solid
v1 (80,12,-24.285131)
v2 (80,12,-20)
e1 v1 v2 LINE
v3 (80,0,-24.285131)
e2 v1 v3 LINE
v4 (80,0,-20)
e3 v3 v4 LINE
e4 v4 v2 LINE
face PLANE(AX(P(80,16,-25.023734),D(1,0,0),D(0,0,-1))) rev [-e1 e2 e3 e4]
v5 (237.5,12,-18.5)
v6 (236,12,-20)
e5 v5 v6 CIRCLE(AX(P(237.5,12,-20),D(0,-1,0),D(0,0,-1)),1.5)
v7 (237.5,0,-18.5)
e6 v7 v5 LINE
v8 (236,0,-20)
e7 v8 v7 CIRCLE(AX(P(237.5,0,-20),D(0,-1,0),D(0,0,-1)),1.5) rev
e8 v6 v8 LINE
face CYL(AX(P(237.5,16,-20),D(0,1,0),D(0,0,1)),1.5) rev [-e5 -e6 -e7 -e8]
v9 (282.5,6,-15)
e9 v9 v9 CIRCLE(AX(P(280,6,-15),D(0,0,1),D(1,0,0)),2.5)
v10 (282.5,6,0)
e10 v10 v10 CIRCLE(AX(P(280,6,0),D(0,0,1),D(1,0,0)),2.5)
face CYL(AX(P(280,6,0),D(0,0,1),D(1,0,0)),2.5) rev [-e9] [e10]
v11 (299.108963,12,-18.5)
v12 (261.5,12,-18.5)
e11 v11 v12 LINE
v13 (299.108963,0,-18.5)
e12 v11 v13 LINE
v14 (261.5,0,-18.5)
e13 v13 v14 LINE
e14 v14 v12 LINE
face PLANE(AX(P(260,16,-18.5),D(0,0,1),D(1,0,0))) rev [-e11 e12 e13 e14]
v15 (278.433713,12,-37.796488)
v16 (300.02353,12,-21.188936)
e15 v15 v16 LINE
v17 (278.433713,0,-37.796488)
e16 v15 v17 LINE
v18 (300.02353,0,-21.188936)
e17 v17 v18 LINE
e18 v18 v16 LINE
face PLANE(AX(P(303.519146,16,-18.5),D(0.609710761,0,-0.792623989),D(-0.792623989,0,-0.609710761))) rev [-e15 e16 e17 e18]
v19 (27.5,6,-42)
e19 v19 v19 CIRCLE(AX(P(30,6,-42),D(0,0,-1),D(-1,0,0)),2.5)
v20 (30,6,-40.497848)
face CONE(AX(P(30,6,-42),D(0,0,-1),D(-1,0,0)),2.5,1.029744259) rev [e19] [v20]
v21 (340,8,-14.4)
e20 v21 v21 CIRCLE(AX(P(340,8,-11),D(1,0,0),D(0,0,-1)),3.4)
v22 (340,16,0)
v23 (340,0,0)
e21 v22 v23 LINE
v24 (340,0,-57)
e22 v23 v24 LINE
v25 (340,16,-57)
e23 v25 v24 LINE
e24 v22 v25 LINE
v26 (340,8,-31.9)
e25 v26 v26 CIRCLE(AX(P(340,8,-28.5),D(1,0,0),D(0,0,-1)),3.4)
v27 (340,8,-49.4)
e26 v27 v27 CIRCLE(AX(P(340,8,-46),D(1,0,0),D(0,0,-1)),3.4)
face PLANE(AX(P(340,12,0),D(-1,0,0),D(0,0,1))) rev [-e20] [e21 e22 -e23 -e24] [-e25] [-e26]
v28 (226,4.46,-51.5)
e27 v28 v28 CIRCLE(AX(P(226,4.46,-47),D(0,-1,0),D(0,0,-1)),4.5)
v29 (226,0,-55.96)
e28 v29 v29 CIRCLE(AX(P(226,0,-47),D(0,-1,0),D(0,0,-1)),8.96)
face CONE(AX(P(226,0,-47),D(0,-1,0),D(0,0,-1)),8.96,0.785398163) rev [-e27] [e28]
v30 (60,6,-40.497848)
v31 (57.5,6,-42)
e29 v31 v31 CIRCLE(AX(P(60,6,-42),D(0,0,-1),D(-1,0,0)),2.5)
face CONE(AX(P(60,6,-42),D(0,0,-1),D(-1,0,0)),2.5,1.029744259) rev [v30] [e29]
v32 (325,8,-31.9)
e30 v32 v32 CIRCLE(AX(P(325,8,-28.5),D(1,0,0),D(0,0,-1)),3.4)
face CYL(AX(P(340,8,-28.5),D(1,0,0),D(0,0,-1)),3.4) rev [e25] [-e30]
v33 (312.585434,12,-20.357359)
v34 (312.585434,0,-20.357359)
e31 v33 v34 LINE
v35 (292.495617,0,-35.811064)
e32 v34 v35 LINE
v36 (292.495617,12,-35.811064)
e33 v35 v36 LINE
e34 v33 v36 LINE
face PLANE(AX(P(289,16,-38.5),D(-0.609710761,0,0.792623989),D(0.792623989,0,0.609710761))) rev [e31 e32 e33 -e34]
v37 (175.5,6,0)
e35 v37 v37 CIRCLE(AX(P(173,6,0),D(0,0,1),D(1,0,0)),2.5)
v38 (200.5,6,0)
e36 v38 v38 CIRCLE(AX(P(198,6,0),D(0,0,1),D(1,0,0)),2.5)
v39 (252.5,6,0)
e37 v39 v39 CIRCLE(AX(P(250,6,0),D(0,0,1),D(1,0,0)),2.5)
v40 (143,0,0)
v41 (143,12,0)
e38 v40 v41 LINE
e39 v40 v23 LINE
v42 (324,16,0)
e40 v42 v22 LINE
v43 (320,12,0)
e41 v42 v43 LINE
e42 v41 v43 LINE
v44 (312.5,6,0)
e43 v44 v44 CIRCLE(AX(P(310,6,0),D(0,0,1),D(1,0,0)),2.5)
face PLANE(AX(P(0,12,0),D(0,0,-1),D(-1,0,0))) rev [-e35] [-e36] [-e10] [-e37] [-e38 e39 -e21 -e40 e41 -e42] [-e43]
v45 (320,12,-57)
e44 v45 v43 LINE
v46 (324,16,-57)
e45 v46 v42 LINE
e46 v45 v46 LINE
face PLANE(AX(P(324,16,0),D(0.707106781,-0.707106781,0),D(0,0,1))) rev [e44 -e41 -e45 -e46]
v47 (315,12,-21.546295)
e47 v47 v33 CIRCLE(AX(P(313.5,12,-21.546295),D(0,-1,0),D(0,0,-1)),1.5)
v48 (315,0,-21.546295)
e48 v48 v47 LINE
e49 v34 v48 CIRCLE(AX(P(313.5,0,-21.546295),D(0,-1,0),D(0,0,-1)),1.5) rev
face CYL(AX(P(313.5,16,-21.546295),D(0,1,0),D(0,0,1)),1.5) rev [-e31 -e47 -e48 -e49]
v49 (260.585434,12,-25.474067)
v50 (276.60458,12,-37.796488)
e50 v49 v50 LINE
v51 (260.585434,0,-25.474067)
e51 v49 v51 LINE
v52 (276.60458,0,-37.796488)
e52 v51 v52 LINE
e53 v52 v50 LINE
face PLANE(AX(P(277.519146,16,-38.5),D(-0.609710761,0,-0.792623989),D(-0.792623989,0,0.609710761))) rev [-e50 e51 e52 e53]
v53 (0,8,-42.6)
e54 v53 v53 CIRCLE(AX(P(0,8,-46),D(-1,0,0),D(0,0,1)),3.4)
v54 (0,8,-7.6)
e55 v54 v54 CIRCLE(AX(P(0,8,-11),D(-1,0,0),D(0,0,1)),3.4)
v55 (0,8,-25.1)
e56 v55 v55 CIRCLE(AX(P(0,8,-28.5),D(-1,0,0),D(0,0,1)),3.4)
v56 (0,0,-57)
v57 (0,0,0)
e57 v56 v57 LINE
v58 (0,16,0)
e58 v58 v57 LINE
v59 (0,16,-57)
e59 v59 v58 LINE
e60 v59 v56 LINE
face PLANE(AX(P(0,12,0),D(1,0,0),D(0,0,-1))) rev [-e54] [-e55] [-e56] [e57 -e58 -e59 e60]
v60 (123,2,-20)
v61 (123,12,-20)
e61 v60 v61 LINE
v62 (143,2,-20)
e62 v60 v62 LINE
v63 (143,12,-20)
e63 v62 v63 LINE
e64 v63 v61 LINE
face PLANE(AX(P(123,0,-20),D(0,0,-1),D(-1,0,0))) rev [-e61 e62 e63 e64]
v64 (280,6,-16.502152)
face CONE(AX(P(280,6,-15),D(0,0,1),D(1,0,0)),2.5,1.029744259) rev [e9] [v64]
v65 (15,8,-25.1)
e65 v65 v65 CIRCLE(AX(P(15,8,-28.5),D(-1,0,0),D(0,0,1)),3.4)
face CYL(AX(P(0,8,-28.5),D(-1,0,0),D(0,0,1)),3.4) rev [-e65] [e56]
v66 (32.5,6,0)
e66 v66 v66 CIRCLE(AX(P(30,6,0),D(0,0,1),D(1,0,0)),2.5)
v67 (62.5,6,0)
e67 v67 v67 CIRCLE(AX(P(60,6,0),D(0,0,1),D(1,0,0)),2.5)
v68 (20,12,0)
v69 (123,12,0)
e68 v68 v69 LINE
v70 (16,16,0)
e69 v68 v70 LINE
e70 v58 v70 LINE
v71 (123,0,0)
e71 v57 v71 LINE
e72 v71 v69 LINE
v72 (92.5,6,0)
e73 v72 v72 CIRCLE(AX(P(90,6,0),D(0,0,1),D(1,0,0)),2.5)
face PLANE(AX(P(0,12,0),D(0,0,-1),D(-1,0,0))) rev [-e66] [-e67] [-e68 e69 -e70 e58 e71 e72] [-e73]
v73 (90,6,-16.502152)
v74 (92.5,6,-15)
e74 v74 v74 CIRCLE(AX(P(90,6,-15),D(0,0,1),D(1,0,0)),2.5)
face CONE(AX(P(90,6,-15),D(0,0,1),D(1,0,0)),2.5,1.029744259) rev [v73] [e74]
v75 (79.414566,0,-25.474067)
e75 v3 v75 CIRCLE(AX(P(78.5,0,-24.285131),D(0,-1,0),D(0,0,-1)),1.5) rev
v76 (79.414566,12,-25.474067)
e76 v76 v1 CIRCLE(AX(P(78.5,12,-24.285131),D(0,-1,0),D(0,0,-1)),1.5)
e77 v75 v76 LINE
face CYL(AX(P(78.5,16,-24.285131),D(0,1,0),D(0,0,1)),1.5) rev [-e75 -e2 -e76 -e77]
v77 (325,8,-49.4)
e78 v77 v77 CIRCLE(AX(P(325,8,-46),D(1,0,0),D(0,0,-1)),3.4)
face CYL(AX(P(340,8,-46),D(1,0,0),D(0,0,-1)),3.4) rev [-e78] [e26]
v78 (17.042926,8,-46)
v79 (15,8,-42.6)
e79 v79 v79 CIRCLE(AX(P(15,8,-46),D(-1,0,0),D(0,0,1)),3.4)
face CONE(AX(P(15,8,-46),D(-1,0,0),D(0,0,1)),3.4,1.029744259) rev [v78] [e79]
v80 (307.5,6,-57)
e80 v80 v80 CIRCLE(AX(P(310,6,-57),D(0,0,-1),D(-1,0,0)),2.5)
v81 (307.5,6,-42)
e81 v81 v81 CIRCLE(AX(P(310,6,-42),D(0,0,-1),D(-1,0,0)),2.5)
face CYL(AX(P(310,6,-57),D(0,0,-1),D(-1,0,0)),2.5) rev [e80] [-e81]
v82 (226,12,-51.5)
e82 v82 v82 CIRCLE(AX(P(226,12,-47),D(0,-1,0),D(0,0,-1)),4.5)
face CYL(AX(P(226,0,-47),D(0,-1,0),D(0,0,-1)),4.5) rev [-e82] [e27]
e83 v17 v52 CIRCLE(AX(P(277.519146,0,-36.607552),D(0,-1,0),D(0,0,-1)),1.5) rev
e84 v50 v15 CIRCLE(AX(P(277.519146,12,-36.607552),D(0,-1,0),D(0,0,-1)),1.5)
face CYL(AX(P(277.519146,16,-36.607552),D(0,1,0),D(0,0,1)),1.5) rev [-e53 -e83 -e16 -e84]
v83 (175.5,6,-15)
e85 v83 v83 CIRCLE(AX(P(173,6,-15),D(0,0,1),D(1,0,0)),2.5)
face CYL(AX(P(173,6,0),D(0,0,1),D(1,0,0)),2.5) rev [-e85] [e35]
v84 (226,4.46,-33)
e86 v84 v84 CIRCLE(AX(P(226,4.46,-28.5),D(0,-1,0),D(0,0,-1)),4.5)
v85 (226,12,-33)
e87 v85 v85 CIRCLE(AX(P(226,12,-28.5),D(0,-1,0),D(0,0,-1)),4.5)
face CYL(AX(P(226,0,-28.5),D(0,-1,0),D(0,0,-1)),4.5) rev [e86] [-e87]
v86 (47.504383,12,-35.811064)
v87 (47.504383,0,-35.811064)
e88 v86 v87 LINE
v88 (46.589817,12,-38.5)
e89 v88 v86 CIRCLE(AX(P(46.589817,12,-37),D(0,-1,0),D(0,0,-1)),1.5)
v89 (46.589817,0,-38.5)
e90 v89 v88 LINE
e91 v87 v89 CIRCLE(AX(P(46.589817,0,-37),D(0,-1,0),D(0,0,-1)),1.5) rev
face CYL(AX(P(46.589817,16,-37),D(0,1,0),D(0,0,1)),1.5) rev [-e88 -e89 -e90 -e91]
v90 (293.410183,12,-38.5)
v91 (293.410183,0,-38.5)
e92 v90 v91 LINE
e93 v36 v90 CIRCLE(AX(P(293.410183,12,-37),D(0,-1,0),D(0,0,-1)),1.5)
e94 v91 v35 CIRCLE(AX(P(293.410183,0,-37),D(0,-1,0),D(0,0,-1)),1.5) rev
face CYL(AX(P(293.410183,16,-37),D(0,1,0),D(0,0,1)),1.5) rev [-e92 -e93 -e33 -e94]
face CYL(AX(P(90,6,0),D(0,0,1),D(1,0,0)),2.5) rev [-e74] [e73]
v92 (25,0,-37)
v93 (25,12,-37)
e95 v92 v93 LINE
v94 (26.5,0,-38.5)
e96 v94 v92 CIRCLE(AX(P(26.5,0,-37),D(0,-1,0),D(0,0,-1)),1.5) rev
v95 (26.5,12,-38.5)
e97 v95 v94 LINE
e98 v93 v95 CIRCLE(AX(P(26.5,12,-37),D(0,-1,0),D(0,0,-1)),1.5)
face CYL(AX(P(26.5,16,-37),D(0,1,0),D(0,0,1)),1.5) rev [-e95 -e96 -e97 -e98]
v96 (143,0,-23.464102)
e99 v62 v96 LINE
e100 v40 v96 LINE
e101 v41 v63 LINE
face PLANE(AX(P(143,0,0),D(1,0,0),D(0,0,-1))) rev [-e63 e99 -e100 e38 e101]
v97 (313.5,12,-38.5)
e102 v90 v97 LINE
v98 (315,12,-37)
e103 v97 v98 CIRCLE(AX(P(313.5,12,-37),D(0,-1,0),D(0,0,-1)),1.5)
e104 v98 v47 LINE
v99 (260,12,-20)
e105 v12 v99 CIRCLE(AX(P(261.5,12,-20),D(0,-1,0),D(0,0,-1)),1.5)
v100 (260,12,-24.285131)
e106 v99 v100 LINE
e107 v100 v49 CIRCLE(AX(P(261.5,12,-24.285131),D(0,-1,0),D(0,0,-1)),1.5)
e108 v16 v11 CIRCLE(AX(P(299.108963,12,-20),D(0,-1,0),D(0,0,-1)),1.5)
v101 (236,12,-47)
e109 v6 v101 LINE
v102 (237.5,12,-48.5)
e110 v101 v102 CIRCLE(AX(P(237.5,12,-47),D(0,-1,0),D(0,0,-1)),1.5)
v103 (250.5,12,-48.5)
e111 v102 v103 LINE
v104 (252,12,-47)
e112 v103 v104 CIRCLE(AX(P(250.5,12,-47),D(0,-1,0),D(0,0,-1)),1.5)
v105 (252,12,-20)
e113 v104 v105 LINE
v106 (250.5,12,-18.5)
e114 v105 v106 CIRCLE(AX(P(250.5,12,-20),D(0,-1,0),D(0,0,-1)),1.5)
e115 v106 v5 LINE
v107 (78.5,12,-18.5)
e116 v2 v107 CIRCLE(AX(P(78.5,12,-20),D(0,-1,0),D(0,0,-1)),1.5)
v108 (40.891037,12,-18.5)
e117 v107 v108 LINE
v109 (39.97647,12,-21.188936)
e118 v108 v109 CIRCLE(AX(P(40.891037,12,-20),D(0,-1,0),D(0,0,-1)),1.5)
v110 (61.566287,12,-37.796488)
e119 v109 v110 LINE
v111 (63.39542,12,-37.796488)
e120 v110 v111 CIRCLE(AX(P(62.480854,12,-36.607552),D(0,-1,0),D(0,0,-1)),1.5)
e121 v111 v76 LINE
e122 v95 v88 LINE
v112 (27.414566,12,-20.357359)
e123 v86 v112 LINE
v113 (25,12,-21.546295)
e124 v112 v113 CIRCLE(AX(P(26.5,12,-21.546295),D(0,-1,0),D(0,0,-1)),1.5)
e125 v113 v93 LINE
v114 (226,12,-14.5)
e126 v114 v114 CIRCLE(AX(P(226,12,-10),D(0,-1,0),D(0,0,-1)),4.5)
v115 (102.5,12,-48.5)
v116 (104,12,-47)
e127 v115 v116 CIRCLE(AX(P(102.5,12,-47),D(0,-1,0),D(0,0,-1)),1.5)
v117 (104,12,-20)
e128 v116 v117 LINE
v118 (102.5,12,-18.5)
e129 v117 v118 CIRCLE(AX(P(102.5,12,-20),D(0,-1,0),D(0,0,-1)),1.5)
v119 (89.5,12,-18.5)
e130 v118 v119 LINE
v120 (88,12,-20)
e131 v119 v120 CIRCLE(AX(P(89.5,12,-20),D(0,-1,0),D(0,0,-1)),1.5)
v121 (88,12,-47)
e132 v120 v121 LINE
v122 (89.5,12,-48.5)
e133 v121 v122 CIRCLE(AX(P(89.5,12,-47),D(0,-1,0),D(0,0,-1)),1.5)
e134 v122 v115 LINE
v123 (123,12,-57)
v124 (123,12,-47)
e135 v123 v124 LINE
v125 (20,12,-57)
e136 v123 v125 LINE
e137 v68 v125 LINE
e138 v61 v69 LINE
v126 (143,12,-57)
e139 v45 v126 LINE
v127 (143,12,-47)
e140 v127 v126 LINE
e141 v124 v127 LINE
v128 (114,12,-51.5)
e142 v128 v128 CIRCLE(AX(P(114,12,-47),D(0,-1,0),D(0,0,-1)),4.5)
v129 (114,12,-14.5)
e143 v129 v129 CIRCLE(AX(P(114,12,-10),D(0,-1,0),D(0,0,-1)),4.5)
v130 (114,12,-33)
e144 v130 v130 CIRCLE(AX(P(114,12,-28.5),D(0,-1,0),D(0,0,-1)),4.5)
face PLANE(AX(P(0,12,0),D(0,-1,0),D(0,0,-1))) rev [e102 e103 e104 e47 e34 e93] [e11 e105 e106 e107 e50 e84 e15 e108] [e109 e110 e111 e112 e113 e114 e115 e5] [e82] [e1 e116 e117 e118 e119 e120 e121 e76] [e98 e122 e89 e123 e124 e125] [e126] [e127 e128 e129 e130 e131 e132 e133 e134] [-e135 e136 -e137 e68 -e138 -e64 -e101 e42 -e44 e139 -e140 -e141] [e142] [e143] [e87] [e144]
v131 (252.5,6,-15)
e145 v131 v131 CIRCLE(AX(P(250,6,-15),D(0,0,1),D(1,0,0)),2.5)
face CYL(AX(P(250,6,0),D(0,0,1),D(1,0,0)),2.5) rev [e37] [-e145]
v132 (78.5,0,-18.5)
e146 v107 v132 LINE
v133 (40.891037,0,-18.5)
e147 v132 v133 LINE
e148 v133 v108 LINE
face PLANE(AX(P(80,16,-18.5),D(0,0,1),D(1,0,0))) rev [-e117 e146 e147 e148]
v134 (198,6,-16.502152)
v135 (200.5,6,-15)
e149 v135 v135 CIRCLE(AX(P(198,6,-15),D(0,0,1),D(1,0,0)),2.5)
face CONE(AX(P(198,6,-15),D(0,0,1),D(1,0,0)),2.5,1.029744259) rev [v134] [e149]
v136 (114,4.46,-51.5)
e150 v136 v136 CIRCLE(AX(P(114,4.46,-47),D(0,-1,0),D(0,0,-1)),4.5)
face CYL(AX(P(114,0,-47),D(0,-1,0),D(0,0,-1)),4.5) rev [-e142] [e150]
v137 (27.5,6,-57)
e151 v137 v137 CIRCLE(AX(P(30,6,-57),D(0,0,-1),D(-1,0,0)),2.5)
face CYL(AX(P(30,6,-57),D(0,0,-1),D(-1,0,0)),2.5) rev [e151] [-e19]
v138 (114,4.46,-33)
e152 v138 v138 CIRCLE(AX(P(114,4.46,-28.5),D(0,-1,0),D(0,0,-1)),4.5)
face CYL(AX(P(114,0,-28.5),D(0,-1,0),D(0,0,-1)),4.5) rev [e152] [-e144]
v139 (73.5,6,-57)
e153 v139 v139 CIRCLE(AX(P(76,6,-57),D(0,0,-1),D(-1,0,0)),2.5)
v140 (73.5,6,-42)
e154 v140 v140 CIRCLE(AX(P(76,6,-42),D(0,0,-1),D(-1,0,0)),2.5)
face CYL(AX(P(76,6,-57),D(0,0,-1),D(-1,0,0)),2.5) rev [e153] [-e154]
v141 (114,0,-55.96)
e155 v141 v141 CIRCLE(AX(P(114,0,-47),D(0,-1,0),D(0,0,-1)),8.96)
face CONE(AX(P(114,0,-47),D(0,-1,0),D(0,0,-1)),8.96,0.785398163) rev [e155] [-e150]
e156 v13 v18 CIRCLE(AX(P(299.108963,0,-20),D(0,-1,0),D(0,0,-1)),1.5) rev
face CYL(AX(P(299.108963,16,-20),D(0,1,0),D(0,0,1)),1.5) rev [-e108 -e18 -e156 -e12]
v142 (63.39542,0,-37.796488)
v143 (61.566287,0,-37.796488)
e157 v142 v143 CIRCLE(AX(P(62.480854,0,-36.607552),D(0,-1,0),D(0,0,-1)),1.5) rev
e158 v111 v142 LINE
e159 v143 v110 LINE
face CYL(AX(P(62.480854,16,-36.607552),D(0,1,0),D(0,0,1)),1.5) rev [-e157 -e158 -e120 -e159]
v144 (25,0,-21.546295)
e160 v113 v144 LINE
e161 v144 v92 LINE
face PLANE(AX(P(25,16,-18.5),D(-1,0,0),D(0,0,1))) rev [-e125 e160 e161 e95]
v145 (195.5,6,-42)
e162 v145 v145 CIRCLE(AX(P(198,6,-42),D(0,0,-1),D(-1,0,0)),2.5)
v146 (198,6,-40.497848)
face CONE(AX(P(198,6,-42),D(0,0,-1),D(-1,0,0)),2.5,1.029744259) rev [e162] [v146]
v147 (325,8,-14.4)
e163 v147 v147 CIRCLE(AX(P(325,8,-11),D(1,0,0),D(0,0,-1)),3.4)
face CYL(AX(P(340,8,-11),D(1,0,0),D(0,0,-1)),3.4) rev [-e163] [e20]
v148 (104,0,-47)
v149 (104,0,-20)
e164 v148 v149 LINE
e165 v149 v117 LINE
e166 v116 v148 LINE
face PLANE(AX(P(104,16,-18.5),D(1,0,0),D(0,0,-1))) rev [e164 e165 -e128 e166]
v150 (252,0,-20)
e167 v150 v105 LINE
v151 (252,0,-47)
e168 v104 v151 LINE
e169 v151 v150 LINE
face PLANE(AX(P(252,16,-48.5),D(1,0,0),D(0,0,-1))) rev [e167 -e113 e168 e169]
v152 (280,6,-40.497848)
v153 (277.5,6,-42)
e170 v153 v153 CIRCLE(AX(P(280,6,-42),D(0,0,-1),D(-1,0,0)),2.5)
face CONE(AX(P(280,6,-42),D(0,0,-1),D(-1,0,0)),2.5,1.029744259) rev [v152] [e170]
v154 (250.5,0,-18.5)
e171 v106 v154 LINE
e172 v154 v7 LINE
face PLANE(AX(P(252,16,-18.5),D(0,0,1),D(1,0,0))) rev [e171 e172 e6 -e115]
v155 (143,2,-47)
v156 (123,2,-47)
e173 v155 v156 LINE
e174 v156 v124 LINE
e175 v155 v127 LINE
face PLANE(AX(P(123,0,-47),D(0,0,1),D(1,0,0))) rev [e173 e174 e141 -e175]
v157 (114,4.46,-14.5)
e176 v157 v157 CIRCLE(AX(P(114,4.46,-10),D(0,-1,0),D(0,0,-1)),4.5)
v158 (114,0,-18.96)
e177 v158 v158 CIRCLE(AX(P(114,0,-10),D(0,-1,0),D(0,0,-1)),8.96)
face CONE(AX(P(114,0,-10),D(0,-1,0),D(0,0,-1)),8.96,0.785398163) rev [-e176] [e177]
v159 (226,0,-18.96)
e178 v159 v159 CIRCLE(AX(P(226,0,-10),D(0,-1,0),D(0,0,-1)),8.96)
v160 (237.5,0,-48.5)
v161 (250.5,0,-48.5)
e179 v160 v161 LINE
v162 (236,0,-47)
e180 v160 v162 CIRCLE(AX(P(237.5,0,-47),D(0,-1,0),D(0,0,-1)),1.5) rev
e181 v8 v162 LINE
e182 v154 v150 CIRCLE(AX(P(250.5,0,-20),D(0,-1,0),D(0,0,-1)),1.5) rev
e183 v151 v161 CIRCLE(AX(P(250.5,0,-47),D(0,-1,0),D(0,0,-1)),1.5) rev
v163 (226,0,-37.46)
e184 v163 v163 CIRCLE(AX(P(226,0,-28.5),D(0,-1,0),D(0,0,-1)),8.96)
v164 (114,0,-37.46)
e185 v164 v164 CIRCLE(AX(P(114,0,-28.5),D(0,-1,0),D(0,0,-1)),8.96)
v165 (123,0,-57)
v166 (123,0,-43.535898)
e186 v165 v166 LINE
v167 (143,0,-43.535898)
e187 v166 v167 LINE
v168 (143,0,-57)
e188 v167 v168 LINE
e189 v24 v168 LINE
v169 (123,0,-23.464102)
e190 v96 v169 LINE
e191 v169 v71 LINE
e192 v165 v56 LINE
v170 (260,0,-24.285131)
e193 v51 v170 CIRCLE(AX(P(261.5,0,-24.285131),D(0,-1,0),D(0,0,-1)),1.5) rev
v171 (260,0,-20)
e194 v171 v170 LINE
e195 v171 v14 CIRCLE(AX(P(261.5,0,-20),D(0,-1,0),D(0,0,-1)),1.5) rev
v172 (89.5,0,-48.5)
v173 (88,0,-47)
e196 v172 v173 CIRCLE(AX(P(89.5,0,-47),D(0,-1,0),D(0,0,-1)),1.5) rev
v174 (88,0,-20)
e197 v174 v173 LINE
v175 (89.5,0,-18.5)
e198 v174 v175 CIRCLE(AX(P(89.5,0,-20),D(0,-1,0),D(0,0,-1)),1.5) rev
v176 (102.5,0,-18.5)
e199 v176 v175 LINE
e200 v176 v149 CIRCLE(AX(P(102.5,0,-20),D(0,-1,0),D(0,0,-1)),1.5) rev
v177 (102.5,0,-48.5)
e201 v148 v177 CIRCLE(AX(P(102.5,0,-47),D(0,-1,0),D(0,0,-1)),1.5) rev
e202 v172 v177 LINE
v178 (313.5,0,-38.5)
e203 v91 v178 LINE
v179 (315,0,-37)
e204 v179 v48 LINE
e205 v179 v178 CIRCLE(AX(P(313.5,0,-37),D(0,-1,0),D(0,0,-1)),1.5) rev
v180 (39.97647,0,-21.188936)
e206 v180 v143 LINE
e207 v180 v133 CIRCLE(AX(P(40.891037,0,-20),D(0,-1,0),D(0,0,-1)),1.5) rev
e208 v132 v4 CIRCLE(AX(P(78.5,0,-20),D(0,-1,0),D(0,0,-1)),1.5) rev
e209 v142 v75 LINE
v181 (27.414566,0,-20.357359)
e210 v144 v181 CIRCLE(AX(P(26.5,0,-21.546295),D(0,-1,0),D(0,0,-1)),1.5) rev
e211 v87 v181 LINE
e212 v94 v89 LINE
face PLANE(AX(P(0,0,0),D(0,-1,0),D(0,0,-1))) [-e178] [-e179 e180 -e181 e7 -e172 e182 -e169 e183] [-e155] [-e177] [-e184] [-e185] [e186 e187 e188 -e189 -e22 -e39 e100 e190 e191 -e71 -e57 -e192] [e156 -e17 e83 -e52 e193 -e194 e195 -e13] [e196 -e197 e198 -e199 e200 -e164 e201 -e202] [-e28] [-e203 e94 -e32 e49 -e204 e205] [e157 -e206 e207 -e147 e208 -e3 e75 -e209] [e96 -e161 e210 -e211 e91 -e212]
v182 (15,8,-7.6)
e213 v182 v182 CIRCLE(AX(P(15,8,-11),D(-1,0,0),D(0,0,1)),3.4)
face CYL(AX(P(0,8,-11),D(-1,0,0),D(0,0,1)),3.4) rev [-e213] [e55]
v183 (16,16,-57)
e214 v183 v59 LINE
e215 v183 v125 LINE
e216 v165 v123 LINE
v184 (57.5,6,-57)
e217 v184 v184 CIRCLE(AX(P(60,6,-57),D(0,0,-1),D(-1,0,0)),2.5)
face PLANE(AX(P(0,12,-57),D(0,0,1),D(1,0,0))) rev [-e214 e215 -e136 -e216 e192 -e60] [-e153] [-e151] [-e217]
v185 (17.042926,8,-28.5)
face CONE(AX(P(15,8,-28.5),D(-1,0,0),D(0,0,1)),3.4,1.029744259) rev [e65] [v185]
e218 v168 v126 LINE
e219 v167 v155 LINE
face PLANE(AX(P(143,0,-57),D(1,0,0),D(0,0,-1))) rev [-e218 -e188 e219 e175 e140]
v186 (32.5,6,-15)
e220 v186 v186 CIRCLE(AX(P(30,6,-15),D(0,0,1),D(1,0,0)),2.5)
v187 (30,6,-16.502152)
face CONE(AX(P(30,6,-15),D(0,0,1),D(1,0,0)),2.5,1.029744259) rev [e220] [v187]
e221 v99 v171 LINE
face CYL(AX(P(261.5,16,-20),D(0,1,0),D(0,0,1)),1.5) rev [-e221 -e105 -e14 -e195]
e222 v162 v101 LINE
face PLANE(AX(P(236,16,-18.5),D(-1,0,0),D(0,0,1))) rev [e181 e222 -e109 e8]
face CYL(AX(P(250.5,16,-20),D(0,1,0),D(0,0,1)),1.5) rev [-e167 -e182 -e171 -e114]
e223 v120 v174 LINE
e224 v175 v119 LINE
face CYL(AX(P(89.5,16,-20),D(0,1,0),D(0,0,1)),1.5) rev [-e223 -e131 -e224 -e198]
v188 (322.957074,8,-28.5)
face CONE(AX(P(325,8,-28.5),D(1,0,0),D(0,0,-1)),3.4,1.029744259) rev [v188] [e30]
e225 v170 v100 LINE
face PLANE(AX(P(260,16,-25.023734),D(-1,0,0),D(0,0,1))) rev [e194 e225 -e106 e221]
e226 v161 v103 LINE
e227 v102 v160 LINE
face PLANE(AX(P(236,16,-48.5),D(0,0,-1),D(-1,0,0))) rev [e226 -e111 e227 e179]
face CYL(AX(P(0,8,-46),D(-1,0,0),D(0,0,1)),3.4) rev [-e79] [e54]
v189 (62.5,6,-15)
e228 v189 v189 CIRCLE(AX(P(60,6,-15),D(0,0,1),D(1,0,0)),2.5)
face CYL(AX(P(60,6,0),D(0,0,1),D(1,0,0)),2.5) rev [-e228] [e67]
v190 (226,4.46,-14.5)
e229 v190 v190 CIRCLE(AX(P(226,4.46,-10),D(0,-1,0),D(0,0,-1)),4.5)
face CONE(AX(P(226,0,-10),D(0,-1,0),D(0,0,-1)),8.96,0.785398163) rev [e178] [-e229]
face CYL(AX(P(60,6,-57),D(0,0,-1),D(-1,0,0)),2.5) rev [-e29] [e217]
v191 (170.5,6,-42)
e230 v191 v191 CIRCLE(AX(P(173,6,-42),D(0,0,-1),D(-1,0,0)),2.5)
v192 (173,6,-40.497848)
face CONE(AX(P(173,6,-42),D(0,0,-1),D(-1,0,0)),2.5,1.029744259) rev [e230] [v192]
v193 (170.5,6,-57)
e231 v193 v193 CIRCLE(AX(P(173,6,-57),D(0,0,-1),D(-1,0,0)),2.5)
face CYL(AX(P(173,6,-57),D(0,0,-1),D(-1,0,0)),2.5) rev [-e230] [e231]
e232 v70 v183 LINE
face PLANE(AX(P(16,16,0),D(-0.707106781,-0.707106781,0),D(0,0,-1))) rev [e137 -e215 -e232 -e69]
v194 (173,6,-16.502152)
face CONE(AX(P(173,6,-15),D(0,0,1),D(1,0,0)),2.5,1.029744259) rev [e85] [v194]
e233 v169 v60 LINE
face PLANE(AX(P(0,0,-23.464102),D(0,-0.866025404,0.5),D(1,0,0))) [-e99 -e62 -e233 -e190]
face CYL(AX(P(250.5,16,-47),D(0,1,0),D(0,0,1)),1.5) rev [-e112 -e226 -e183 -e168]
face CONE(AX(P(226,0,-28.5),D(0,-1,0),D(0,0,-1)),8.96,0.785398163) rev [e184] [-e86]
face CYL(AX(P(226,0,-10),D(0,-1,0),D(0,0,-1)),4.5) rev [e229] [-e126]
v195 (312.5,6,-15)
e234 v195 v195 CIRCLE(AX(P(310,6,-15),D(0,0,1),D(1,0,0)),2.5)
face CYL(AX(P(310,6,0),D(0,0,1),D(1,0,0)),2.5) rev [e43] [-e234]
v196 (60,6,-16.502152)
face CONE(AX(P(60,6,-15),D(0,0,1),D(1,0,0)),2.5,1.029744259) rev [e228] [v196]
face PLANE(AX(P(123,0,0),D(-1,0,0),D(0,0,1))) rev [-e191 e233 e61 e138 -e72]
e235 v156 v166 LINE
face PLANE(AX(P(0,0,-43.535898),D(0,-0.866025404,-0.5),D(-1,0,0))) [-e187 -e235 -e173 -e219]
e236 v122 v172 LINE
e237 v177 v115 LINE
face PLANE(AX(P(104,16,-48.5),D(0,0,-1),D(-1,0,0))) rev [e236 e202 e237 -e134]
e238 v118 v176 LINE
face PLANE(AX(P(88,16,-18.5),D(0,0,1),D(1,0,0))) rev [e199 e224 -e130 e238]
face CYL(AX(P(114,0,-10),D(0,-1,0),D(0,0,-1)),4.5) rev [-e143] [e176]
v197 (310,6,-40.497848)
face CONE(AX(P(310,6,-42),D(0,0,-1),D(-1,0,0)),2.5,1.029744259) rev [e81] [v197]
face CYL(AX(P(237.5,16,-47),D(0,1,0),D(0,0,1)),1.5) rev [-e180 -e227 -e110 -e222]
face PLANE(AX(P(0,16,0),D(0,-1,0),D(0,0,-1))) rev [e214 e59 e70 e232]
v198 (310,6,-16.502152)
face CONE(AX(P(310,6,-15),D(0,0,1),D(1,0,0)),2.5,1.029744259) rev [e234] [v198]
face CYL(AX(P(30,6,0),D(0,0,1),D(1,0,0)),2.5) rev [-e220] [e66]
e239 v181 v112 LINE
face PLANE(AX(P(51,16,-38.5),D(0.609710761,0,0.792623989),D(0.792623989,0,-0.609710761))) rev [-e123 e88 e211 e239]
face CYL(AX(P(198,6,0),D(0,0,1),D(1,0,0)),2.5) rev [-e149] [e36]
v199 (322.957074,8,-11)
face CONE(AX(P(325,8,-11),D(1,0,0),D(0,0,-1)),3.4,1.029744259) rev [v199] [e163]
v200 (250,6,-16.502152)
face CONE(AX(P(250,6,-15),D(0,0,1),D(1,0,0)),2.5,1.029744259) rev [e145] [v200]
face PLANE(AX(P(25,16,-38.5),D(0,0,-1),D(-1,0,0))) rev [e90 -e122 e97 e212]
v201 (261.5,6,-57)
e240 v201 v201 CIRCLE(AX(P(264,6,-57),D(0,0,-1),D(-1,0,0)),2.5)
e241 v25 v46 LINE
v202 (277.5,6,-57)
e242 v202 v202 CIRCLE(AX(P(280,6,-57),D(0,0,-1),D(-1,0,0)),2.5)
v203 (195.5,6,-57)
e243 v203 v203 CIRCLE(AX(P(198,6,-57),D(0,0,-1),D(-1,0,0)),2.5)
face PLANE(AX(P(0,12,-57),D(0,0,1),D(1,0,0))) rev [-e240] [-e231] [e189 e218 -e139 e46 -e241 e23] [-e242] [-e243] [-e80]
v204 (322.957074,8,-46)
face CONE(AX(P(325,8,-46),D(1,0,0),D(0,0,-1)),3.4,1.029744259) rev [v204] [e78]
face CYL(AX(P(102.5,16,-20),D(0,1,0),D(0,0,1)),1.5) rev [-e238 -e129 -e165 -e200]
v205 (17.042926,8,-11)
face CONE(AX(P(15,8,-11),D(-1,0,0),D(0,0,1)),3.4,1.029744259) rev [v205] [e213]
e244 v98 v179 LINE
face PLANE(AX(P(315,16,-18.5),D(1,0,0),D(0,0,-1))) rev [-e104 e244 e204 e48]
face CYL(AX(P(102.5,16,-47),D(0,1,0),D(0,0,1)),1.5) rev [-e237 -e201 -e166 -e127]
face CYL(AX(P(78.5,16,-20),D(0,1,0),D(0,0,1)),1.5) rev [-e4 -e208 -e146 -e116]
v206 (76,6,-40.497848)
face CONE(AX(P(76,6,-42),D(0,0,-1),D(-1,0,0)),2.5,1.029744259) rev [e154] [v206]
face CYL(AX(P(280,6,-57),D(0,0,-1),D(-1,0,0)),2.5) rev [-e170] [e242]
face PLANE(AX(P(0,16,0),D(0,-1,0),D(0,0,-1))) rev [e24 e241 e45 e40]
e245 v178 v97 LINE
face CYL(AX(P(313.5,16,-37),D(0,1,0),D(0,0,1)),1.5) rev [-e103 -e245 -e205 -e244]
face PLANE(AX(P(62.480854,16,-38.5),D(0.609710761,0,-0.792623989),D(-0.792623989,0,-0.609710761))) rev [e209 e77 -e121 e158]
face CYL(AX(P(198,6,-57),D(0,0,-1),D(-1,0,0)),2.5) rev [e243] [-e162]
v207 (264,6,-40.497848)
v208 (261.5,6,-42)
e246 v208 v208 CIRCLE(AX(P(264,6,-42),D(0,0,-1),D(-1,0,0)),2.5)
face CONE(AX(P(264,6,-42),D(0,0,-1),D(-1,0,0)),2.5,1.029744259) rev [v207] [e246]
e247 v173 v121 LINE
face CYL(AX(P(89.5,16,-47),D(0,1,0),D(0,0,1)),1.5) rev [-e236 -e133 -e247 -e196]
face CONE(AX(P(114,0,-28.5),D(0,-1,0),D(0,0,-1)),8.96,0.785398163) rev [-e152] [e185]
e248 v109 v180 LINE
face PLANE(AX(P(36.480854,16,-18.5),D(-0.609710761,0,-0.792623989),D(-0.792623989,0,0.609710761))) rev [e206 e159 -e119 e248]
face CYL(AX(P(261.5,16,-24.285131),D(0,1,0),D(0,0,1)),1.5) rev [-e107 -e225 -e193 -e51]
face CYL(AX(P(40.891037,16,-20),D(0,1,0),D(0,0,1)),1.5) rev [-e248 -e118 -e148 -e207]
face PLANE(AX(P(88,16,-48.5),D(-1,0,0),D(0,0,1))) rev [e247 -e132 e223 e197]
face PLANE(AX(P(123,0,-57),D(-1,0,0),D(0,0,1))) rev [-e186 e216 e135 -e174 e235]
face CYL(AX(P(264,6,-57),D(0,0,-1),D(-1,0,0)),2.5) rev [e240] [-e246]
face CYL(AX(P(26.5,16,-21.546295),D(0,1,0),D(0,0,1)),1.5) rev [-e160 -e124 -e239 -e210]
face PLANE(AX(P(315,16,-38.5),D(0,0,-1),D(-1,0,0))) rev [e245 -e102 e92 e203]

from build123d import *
from OCP.BRepFilletAPI import BRepFilletAPI_MakeChamfer

# Parameters (mm, degrees)
ESBO_O1_W                                           = 340
ESBO_O1_H                                           = 57
RESSALTO_EXTRUS_O1_DEPTH                            = 12
ESBO_O2_W                                           = 20
ESBO_O2_H                                           = 57
RESSALTO_EXTRUS_O2_DEPTH                            = 4
BROCA_DE_ROSQUEAR_PARA_TARRAXA_DE_M81_D             = 6.8
BROCA_DE_ROSQUEAR_PARA_TARRAXA_DE_M81_DEPTH         = 15
BROCA_DE_ROSQUEAR_PARA_TARRAXA_DE_M81_TIP           = 2.042926105
BROCA_DE_ROSQUEAR_PARA_TARRAXA_DE_M82_D             = 6.8
BROCA_DE_ROSQUEAR_PARA_TARRAXA_DE_M82_DEPTH         = 15
BROCA_DE_ROSQUEAR_PARA_TARRAXA_DE_M82_TIP           = 2.042926105
ESBO_O7_W                                           = 20
ESBO_O7_H                                           = 10
ESBO_O7_H_2                                         = 20
CORTE_EXTRUS_O1_DEPTH                               = 345.953620071
CHANFRO1_SIZE                                       = 2
CHANFRO1_SIZE2                                      = 3.464101615
CHANFRO3_SIZE                                       = 4
BROCA_DE_ROSQUEAR_PARA_TARRAXA_DE_M61_D             = 5
BROCA_DE_ROSQUEAR_PARA_TARRAXA_DE_M61_DEPTH         = 15
BROCA_DE_ROSQUEAR_PARA_TARRAXA_DE_M61_TIP           = 1.502151548
BROCA_DE_ROSQUEAR_PARA_TARRAXA_DE_M62_D             = 5
BROCA_DE_ROSQUEAR_PARA_TARRAXA_DE_M62_DEPTH         = 15
BROCA_DE_ROSQUEAR_PARA_TARRAXA_DE_M62_TIP           = 1.502151548
ESCAREADO_PARA_PARAFUSO_ALLEN_SEXTAVADO_D           = 9
ESCAREADO_PARA_PARAFUSO_ALLEN_SEXTAVADO_DEPTH       = 15
ESCAREADO_PARA_PARAFUSO_ALLEN_SEXTAVADO_CSINK_D     = 17.92
ESCAREADO_PARA_PARAFUSO_ALLEN_SEXTAVADO_CSINK_ANGLE = 90
ESCAREADO_PARA_PARAFUSO_ALLEN_SEXTAVADO_TIP         = 2.703872786
ESBO_O19_W                                          = 16
ESBO_O19_H                                          = 30
CORTE_EXTRUS_O3_DEPTH                               = 346.115922554
FILETE6_R                                           = 1.5


with BuildPart() as part:
    # Esboço1 → Ressalto-extrusão1 (new body)
    with BuildSketch(Plane(origin=(0, 0, 0), x_dir=(1, 0, 0), z_dir=(0, 1, 0))):
        with Locations((170, 28.5)):
            Rectangle(ESBO_O1_W, ESBO_O1_H)
    extrude(amount=RESSALTO_EXTRUS_O1_DEPTH)

    # Esboço2 → Ressalto-extrusão2 (add)
    with BuildSketch(Plane(origin=(0, 12, 0), x_dir=(1, 0, 0), z_dir=(0, 1, 0))):
        with Locations((10, 28.5)):
            Rectangle(ESBO_O2_W, ESBO_O2_H)
        with Locations((330, 28.5)):
            Rectangle(ESBO_O2_W, ESBO_O2_H)
    extrude(amount=RESSALTO_EXTRUS_O2_DEPTH)

    # Broca de rosquear para tarraxa de M81
    with Locations(Plane.ZY):
        with Locations((-46, 8), (-28.5, 8), (-11, 8)):
            Hole(BROCA_DE_ROSQUEAR_PARA_TARRAXA_DE_M81_D / 2, depth=BROCA_DE_ROSQUEAR_PARA_TARRAXA_DE_M81_DEPTH)
            with Locations((0, 0, -(BROCA_DE_ROSQUEAR_PARA_TARRAXA_DE_M81_DEPTH + BROCA_DE_ROSQUEAR_PARA_TARRAXA_DE_M81_TIP / 2))):  # 118° drill point
                Cone(0, BROCA_DE_ROSQUEAR_PARA_TARRAXA_DE_M81_D / 2, BROCA_DE_ROSQUEAR_PARA_TARRAXA_DE_M81_TIP, mode=Mode.SUBTRACT)

    # Broca de rosquear para tarraxa de M82
    with Locations(Plane(origin=(340, 0, 0), x_dir=(0, 0, -1), z_dir=(1, 0, 0))):
        with Locations((28.5, 8), (11, 8), (46, 8)):
            Hole(BROCA_DE_ROSQUEAR_PARA_TARRAXA_DE_M82_D / 2, depth=BROCA_DE_ROSQUEAR_PARA_TARRAXA_DE_M82_DEPTH)
            with Locations((0, 0, -(BROCA_DE_ROSQUEAR_PARA_TARRAXA_DE_M82_DEPTH + BROCA_DE_ROSQUEAR_PARA_TARRAXA_DE_M82_TIP / 2))):  # 118° drill point
                Cone(0, BROCA_DE_ROSQUEAR_PARA_TARRAXA_DE_M82_D / 2, BROCA_DE_ROSQUEAR_PARA_TARRAXA_DE_M82_TIP, mode=Mode.SUBTRACT)

    # Esboço7 → Corte-extrusão1 (cut, through all)
    with BuildSketch(Plane(origin=(0, 12, 0), x_dir=(1, 0, 0), z_dir=(0, 1, 0))):
        with Locations((133, 52)):
            Rectangle(ESBO_O7_W, ESBO_O7_H)
        with Locations((133, 10)):
            Rectangle(ESBO_O7_W, ESBO_O7_H_2)
    extrude(amount=-CORTE_EXTRUS_O1_DEPTH, mode=Mode.SUBTRACT)

    # Chanfro1: one chamfer whose edges measure the first distance from different faces: ONE call of the kernel's chamfer builder (chamfer() names one face for all edges)
    chanfro1_edges_1 = [part.edges().sort_by_distance(p)[0] for p in [
        (133, 0, -47),
    ]]
    chanfro1_side_1 = [part.faces().sort_by_distance(p)[0] for p in [
        (133, 6, -47),
    ]]
    chanfro1_edges_2 = [part.edges().sort_by_distance(p)[0] for p in [
        (133, 0, -20),
    ]]
    chanfro1_side_2 = [part.faces().sort_by_distance(p)[0] for p in [
        (133, 6, -20),
    ]]
    chanfro1 = BRepFilletAPI_MakeChamfer(part.part.solid().wrapped)
    for e in chanfro1_edges_1:
        chanfro1.Add(CHANFRO1_SIZE, CHANFRO1_SIZE2, e.wrapped, chanfro1_side_1[0].wrapped)  # the first distance lies on this face
    for e in chanfro1_edges_2:
        chanfro1.Add(CHANFRO1_SIZE, CHANFRO1_SIZE2, e.wrapped, chanfro1_side_2[0].wrapped)  # the first distance lies on this face
    add(Compound.cast(chanfro1.Shape()), mode=Mode.REPLACE)

    # Chanfro3
    chanfro3_edges = [part.edges().sort_by_distance(p)[0] for p in [
        (20, 16, -28.5),
        (320, 16, -28.5),
    ]]
    chamfer(chanfro3_edges, length=CHANFRO3_SIZE - 0.0001)  # a hair under: the kernel refuses the full size

    # Broca de rosquear para tarraxa de M61
    with Locations(Plane(origin=(0, 0, -57), x_dir=(-1, 0, 0), z_dir=(0, 0, -1))):
        with Locations((-310, 6), (-280, 6), (-30, 6), (-60, 6), (-264, 6), (-76, 6), (-198, 6), (-173, 6)):
            Hole(BROCA_DE_ROSQUEAR_PARA_TARRAXA_DE_M61_D / 2, depth=BROCA_DE_ROSQUEAR_PARA_TARRAXA_DE_M61_DEPTH)
            with Locations((0, 0, -(BROCA_DE_ROSQUEAR_PARA_TARRAXA_DE_M61_DEPTH + BROCA_DE_ROSQUEAR_PARA_TARRAXA_DE_M61_TIP / 2))):  # 118° drill point
                Cone(0, BROCA_DE_ROSQUEAR_PARA_TARRAXA_DE_M61_D / 2, BROCA_DE_ROSQUEAR_PARA_TARRAXA_DE_M61_TIP, mode=Mode.SUBTRACT)

    # Broca de rosquear para tarraxa de M62
    with Locations(Plane.XY):
        with Locations((30, 6), (60, 6), (280, 6), (310, 6), (90, 6), (250, 6), (173, 6), (198, 6)):
            Hole(BROCA_DE_ROSQUEAR_PARA_TARRAXA_DE_M62_D / 2, depth=BROCA_DE_ROSQUEAR_PARA_TARRAXA_DE_M62_DEPTH)
            with Locations((0, 0, -(BROCA_DE_ROSQUEAR_PARA_TARRAXA_DE_M62_DEPTH + BROCA_DE_ROSQUEAR_PARA_TARRAXA_DE_M62_TIP / 2))):  # 118° drill point
                Cone(0, BROCA_DE_ROSQUEAR_PARA_TARRAXA_DE_M62_D / 2, BROCA_DE_ROSQUEAR_PARA_TARRAXA_DE_M62_TIP, mode=Mode.SUBTRACT)

    # Escareado para parafuso Allen sextavado escareado de M82
    with Locations(Plane(origin=(0, 0, 0), x_dir=(-1, 0, 0), z_dir=(0, -1, 0))):
        with Locations((-114, 47), (-114, 28.5), (-114, 10), (-226, 47), (-226, 28.5), (-226, 10)):
            CounterSinkHole(ESCAREADO_PARA_PARAFUSO_ALLEN_SEXTAVADO_D / 2, ESCAREADO_PARA_PARAFUSO_ALLEN_SEXTAVADO_CSINK_D / 2, depth=ESCAREADO_PARA_PARAFUSO_ALLEN_SEXTAVADO_DEPTH, counter_sink_angle=ESCAREADO_PARA_PARAFUSO_ALLEN_SEXTAVADO_CSINK_ANGLE)
            with Locations((0, 0, -(ESCAREADO_PARA_PARAFUSO_ALLEN_SEXTAVADO_DEPTH + ESCAREADO_PARA_PARAFUSO_ALLEN_SEXTAVADO_TIP / 2))):  # 118° drill point
                Cone(0, ESCAREADO_PARA_PARAFUSO_ALLEN_SEXTAVADO_D / 2, ESCAREADO_PARA_PARAFUSO_ALLEN_SEXTAVADO_TIP, mode=Mode.SUBTRACT)

    # Esboço19 → Corte-extrusão3 (cut, through all)
    with BuildSketch(Plane.XZ):
        Polygon((25, -18.5), (25, -38.5), (51, -38.5), align=None)
        Polygon((36.480853627, -18.5), (62.480853627, -38.5), (80, -25.023733559), (80, -18.5), (62.480853627, -18.5), align=None)
        with Locations((96, -33.5)):
            Rectangle(ESBO_O19_W, ESBO_O19_H)
        with Locations((244, -33.5)):
            Rectangle(ESBO_O19_W, ESBO_O19_H)
        Polygon((260, -25.023733559), (260, -18.5), (277.519146373, -18.5), (303.519146373, -18.5), (277.519146373, -38.5), align=None)
        Polygon((315, -38.5), (289, -38.5), (315, -18.5), align=None)
    extrude(amount=-CORTE_EXTRUS_O3_DEPTH, mode=Mode.SUBTRACT)

    # Filete6
    filete6_edges = [part.edges().sort_by_distance(p)[0] for p in [
        (36.480853627, 6, -18.5),
        (80, 6, -18.5),
        (80, 6, -25.023733559),
        (62.480853627, 6, -38.5),
        (104, 6, -48.5),
        (88, 6, -48.5),
        (88, 6, -18.5),
        (104, 6, -18.5),
        (252, 6, -18.5),
        (252, 6, -48.5),
        (236, 6, -48.5),
        (236, 6, -18.5),
        (277.519146373, 6, -38.5),
        (260, 6, -25.023733559),
        (260, 6, -18.5),
        (303.519146373, 6, -18.5),
        (315, 6, -18.5),
        (315, 6, -38.5),
        (289, 6, -38.5),
        (25, 6, -18.5),
        (51, 6, -38.5),
        (25, 6, -38.5),
    ]]
    fillet(filete6_edges, radius=FILETE6_R)


solid = part.part
